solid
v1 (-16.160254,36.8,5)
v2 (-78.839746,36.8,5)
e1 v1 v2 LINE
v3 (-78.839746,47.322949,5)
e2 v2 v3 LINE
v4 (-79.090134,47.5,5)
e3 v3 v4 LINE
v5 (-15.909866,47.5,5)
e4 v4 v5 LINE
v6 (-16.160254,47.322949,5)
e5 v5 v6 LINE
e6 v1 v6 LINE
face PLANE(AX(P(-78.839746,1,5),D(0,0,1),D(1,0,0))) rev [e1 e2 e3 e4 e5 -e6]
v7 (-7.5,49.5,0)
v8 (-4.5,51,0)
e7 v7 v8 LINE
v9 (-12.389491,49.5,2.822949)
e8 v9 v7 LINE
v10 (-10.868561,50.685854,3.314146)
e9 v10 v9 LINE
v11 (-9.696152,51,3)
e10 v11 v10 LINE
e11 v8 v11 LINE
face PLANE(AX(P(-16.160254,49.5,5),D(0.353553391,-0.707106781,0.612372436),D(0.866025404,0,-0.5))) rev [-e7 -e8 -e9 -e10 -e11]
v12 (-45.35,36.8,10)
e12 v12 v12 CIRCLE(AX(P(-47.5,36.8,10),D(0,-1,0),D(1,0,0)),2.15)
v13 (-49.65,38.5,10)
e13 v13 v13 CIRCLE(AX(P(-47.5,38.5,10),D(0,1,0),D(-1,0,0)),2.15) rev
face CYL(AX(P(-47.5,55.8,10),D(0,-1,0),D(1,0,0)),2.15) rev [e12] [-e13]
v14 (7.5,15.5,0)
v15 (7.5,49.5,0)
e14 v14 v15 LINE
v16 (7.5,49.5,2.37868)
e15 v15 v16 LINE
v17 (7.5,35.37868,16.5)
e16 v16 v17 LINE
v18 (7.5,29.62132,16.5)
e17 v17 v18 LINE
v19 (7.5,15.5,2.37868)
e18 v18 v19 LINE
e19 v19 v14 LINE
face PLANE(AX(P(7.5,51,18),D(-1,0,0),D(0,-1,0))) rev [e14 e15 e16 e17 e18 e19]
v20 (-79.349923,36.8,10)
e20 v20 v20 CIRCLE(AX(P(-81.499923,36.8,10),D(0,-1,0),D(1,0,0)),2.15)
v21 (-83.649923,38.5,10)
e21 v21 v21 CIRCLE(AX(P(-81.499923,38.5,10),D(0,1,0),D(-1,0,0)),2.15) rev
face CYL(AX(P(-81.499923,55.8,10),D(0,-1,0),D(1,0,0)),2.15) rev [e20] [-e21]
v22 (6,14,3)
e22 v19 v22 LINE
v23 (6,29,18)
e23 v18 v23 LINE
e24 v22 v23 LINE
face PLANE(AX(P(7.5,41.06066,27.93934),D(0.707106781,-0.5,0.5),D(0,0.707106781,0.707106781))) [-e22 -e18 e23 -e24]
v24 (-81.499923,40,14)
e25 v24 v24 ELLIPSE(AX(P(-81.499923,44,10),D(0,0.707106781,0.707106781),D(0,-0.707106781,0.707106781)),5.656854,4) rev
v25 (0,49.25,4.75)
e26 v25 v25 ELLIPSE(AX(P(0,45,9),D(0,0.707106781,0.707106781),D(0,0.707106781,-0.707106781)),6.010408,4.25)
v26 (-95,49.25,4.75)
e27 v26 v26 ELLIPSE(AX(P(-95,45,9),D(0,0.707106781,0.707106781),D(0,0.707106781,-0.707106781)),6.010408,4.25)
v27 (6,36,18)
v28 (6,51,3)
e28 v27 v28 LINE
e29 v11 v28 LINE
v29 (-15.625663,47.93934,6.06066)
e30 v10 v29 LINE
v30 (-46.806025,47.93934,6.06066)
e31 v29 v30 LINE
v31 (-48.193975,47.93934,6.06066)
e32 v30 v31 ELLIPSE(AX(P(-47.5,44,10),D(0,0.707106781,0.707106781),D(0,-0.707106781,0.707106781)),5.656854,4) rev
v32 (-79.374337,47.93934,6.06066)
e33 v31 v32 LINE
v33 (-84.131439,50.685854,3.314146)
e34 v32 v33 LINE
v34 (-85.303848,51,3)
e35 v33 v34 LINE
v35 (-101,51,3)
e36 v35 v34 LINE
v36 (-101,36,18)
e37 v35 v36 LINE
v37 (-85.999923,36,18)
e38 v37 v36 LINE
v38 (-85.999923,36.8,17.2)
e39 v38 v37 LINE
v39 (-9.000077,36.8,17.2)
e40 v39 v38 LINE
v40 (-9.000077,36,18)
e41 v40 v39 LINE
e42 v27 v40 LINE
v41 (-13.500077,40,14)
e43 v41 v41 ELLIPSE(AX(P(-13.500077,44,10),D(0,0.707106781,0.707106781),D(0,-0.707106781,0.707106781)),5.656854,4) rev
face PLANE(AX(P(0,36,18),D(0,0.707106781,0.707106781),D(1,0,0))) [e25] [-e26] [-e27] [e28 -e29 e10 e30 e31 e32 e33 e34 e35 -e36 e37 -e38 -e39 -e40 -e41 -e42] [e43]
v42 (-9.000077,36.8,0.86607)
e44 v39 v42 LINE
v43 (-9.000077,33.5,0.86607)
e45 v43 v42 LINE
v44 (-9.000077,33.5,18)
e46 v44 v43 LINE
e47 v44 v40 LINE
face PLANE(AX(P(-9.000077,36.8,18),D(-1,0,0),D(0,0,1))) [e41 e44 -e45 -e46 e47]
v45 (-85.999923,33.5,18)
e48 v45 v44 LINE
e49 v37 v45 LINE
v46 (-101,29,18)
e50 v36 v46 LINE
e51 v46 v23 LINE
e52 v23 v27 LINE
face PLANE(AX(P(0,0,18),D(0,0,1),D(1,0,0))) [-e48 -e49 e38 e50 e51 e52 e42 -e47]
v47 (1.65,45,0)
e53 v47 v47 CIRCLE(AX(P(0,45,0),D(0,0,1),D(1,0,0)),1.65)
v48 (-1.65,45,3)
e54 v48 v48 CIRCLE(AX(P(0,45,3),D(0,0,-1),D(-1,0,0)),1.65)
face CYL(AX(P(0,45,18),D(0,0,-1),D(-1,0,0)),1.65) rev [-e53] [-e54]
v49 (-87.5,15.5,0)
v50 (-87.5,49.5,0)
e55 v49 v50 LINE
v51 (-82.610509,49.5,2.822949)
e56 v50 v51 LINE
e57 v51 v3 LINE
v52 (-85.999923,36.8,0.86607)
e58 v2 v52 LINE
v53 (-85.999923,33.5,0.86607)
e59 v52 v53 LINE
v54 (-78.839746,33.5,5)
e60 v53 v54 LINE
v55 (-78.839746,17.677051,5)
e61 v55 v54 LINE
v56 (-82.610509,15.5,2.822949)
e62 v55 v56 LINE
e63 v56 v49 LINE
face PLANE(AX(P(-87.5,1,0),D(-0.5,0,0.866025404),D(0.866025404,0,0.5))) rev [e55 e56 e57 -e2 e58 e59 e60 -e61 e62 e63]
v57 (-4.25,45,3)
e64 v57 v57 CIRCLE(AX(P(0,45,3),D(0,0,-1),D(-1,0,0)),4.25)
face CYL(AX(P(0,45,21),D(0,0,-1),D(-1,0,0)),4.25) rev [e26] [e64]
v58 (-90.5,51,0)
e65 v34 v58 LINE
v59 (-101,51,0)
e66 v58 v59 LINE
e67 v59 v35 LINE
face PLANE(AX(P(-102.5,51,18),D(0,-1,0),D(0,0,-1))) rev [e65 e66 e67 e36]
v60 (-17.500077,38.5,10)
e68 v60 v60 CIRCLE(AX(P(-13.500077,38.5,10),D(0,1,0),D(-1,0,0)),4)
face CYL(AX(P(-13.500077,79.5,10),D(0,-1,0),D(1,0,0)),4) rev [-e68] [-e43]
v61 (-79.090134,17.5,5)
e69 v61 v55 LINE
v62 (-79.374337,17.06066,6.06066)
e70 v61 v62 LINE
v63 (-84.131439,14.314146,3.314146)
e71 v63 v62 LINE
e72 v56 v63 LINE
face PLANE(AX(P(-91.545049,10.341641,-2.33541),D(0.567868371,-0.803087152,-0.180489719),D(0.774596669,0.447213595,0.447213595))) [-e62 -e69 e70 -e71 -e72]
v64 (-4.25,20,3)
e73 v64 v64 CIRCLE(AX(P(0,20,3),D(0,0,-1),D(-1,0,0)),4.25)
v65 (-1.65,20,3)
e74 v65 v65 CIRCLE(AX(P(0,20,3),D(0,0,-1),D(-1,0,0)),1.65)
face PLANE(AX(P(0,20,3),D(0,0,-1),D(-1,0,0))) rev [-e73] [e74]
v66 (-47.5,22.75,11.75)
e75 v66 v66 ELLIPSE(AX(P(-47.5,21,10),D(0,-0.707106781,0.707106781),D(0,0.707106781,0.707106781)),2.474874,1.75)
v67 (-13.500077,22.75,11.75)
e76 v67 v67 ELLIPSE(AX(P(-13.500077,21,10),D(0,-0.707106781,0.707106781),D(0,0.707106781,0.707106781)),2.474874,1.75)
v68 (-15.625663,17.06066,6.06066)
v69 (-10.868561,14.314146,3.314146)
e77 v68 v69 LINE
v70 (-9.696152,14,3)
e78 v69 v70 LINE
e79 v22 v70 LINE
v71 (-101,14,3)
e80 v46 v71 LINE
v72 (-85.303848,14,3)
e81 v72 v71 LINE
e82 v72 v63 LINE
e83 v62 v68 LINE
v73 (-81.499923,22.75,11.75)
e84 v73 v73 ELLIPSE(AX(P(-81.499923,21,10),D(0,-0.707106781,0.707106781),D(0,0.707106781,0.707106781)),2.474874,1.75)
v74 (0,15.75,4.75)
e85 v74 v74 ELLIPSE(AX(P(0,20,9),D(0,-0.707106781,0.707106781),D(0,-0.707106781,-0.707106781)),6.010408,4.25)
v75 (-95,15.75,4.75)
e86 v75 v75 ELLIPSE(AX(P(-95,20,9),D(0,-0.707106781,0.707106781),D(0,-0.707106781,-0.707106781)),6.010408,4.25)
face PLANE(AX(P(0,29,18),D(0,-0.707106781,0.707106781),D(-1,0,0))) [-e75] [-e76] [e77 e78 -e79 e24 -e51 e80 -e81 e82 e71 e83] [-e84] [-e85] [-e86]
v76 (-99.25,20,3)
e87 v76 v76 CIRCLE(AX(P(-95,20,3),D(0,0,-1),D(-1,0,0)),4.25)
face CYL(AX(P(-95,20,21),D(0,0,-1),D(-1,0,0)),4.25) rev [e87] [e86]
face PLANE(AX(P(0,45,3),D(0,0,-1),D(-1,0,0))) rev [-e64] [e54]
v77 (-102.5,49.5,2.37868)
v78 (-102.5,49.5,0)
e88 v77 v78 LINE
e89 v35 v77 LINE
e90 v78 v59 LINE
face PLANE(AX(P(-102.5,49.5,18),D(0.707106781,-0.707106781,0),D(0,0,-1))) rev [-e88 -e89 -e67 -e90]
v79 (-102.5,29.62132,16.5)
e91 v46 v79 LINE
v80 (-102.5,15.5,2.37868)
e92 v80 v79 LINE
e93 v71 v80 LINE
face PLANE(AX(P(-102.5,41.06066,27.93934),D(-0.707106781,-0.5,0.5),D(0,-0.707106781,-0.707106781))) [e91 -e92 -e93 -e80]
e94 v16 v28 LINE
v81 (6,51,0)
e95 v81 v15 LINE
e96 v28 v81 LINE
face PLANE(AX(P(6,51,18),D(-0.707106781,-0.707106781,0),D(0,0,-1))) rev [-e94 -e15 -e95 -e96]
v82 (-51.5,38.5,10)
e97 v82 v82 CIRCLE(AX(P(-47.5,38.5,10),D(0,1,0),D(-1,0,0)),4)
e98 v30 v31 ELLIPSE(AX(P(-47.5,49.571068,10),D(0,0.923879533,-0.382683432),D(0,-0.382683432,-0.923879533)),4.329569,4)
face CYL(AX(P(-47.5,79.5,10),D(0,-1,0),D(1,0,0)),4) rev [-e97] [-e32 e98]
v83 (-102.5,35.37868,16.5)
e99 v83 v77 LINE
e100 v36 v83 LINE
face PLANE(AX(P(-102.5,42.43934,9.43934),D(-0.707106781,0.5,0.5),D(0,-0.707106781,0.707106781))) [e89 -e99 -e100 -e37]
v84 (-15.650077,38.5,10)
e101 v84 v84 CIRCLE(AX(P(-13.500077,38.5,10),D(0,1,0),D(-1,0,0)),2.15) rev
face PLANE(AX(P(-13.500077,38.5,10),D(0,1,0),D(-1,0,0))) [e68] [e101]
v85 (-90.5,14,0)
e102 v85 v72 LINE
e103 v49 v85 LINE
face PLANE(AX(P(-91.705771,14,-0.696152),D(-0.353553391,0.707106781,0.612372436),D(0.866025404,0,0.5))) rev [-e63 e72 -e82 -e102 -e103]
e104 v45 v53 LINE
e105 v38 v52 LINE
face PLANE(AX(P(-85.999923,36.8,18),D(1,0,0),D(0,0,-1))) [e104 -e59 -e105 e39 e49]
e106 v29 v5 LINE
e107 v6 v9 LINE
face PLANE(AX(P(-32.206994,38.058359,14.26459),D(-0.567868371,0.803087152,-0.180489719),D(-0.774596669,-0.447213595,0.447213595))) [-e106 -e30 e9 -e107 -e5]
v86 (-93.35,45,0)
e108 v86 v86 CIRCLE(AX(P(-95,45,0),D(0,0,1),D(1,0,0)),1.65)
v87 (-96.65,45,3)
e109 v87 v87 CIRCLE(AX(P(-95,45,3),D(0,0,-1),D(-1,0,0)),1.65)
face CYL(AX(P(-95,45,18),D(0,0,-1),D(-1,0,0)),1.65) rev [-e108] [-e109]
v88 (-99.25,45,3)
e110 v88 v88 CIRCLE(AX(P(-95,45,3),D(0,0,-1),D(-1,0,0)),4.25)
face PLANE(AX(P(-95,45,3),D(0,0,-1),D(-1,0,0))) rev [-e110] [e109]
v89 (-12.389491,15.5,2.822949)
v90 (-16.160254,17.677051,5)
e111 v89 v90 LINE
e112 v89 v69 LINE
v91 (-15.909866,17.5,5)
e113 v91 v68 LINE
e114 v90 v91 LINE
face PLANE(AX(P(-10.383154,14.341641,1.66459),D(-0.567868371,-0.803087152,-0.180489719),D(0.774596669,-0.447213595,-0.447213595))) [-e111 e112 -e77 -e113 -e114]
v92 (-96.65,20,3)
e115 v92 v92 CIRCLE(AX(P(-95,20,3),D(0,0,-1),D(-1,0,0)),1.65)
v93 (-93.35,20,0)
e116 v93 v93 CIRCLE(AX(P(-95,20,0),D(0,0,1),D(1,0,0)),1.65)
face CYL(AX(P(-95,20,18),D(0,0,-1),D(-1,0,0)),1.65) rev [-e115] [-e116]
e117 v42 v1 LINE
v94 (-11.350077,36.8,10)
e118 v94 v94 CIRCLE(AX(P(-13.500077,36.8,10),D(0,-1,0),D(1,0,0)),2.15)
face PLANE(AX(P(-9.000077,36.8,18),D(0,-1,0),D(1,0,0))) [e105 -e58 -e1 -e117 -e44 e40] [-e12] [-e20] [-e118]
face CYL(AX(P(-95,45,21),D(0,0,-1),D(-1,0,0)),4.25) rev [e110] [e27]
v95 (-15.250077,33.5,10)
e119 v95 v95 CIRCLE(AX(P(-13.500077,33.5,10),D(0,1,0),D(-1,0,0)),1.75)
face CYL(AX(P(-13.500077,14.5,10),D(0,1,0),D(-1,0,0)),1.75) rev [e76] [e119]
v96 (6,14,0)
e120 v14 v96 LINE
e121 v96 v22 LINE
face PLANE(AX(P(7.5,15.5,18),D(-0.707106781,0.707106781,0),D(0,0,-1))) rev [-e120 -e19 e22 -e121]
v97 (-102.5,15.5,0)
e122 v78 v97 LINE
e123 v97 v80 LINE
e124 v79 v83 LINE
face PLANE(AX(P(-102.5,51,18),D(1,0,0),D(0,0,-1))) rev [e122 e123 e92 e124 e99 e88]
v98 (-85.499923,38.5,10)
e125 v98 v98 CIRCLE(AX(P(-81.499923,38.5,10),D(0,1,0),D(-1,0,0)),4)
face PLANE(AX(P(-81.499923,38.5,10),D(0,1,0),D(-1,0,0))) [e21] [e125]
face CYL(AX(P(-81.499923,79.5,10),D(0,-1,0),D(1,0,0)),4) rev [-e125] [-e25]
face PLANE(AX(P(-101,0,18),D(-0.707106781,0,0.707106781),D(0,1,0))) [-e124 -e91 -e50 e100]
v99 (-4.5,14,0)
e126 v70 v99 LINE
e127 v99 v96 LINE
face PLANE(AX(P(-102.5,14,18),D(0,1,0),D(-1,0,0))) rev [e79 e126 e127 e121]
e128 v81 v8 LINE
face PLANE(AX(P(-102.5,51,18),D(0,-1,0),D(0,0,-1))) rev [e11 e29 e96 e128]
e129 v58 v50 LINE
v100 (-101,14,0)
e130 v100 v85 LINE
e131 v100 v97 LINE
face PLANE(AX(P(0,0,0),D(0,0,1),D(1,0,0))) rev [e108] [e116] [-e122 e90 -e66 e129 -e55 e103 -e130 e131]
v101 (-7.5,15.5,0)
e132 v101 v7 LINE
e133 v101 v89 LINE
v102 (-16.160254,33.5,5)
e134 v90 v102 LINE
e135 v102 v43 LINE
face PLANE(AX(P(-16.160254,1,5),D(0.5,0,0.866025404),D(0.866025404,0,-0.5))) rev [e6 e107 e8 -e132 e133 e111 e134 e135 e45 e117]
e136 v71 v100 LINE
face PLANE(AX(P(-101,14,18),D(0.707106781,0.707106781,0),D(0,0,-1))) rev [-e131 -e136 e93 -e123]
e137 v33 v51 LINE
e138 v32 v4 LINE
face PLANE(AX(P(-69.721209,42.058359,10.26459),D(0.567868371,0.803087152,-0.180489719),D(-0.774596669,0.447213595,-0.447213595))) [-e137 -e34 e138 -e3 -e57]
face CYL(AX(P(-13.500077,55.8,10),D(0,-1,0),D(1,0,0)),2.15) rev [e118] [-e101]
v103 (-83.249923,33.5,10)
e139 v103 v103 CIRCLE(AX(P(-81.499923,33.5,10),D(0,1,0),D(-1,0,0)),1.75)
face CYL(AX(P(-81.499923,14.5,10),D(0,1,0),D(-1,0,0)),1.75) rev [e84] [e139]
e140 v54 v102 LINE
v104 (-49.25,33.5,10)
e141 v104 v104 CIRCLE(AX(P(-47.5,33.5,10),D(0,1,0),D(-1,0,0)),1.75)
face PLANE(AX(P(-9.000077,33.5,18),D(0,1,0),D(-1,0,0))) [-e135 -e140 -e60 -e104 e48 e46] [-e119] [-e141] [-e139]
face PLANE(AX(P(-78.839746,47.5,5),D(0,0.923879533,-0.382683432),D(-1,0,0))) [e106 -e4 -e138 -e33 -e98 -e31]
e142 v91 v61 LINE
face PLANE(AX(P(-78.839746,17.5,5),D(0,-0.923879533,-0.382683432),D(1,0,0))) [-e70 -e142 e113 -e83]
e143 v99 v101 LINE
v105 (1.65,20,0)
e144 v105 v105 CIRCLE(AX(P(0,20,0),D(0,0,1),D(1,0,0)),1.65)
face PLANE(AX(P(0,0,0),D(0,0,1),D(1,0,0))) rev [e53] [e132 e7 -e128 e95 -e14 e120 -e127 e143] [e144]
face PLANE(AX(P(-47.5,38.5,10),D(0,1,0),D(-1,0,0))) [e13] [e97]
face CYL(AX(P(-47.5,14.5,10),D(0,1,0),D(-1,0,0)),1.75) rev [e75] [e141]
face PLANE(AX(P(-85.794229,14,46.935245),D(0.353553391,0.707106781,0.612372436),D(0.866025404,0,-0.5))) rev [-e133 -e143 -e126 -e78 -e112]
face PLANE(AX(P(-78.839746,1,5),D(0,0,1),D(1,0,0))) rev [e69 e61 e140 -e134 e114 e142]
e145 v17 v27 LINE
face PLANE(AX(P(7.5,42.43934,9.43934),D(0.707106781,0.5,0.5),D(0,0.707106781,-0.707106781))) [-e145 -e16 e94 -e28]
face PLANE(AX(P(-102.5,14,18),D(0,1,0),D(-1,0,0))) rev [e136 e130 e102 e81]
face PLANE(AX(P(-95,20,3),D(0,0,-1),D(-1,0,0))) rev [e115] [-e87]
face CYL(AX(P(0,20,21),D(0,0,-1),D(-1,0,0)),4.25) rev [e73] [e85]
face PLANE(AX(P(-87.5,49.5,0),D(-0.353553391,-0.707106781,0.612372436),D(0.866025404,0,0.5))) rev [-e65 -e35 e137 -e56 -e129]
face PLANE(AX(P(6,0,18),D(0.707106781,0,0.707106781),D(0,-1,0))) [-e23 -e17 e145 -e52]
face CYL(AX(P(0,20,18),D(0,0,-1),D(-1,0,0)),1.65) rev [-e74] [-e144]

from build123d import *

# Parameters (mm, degrees)
SKETCH1_W          = 110
SKETCH1_H          = 37
SKETCH1_W_2        = 76.99984649
SKETCH1_H_2        = 3.3
EXTRUDE1_DEPTH     = 18
CHAMFER1_SIZE      = 15
SKETCH3_R          = 4.25
CUT_EXTRUDE1_DEPTH = 18
SKETCH4_R          = 2.15
CUT_EXTRUDE2_DEPTH = 19
SKETCH5_R          = 1.75
CUT_EXTRUDE3_DEPTH = 19
SKETCH6_R          = 4
CUT_EXTRUDE4_DEPTH = 41
CUT_EXTRUDE5_DEPTH = 50
CHAMFER2_SIZE      = 1.5
CHAMFER4_SIZE      = 1.5


with BuildPart() as part:
    # Sketch1 → Extrude1 (new body)
    with BuildSketch(Plane.XY):
        with Locations((-47.5, 32.5)):
            Rectangle(SKETCH1_W, SKETCH1_H)
        with Locations((-47.499999999, 35.15)):
            Rectangle(SKETCH1_W_2, SKETCH1_H_2, mode=Mode.SUBTRACT)
        with BuildLine():
            ThreePointArc((-95, 18.35), (-93.35, 20), (-95, 21.65))
            ThreePointArc((-95, 21.65), (-96.65, 20), (-95, 18.35))
        make_face(mode=Mode.SUBTRACT)
        with BuildLine():
            ThreePointArc((0, 18.35), (1.65, 20), (0, 21.65))
            ThreePointArc((0, 21.65), (-1.65, 20), (0, 18.35))
        make_face(mode=Mode.SUBTRACT)
        with BuildLine():
            ThreePointArc((0, 43.35), (1.65, 45), (0, 46.65))
            ThreePointArc((0, 46.65), (-1.65, 45), (0, 43.35))
        make_face(mode=Mode.SUBTRACT)
        with BuildLine():
            ThreePointArc((-95, 43.35), (-93.35, 45), (-95, 46.65))
            ThreePointArc((-95, 46.65), (-96.65, 45), (-95, 43.35))
        make_face(mode=Mode.SUBTRACT)
    extrude(amount=EXTRUDE1_DEPTH)

    # Chamfer1
    # the kernel refuses this chamfer: 15 mm, written as the material it takes off along each edge
    with BuildSketch(Plane(origin=(46.075244819, 14, 18), x_dir=(0, 0.9996219169112968, 0.02749587661058632), z_dir=(-1, 0, 0))) as chamfer1_piece_1:
        Polygon((CHAMFER1_SIZE * 0.999621916911, CHAMFER1_SIZE * 0.0274958766106), (-CHAMFER1_SIZE * 0.0274958766106, CHAMFER1_SIZE * 0.999621916911), (0, 0), align=None)
    extrude(amount=187.150489639, mode=Mode.SUBTRACT)
    with BuildSketch(Plane(origin=(-141.075244819, 51, 18), x_dir=(0, 0.02749587661058632, -0.9996219169112968), z_dir=(1, 0, 0))) as chamfer1_piece_2:
        Polygon((CHAMFER1_SIZE * 0.999621916911, -CHAMFER1_SIZE * 0.0274958766106), (-CHAMFER1_SIZE * 0.0274958766106, -CHAMFER1_SIZE * 0.999621916911), (0, 0), align=None)
    extrude(amount=187.150489639, mode=Mode.SUBTRACT)

    # Sketch3 → Cut-Extrude1 (cut)
    with BuildSketch(Plane(origin=(0, 0, 3), x_dir=(-1, 0, 0), z_dir=(0, 0, -1))):
        with Locations((0, 20)):
            Circle(SKETCH3_R)
        with Locations((95, 20)):
            Circle(SKETCH3_R)
        with Locations((0, 45)):
            Circle(SKETCH3_R)
        with Locations((95, 45)):
            Circle(SKETCH3_R)
    extrude(amount=-CUT_EXTRUDE1_DEPTH, mode=Mode.SUBTRACT)

    # Sketch4 → Cut-Extrude2 (cut)
    with BuildSketch(Plane.XZ.offset(-36.8)):
        with Locations((-13.500076755, 10)):
            Circle(SKETCH4_R)
        with Locations((-81.499923245, 10)):
            Circle(SKETCH4_R)
        with Locations((-47.5, 10)):
            Circle(SKETCH4_R)
    extrude(amount=-CUT_EXTRUDE2_DEPTH, mode=Mode.SUBTRACT)

    # Sketch5 → Cut-Extrude3 (cut)
    with BuildSketch(Plane(origin=(0, 33.5, 0), x_dir=(1, 0, 0), z_dir=(0, 1, 0))):
        with Locations(Location((-81.499923245, -10, 0), (0, 0, 180))):
            Circle(SKETCH5_R)
        with Locations(Location((-47.5, -10, 0), (0, 0, 180))):
            Circle(SKETCH5_R)
        with Locations(Location((-13.500076755, -10, 0), (0, 0, 180))):
            Circle(SKETCH5_R)
    extrude(amount=-CUT_EXTRUDE3_DEPTH, mode=Mode.SUBTRACT)

    # Sketch6 → Cut-Extrude4 (cut)
    with BuildSketch(Plane(origin=(0, 38.5, 0), x_dir=(1, 0, 0), z_dir=(0, 1, 0))):
        with Locations(Location((-81.499923245, -10, 0), (0, 0, 270))):
            Circle(SKETCH6_R)
        with Locations(Location((-47.5, -10, 0), (0, 0, 270))):
            Circle(SKETCH6_R)
        with Locations(Location((-13.500076755, -10, 0), (0, 0, 270))):
            Circle(SKETCH6_R)
    extrude(amount=CUT_EXTRUDE4_DEPTH, mode=Mode.SUBTRACT)

    # Sketch7 → Cut-Extrude5 (cut)
    with BuildSketch(Plane(origin=(0, 51, 0), x_dir=(1, 0, 0), z_dir=(0, 1, 0))):
        Polygon((-87.5, 0), (-78.839745962, -5), (-16.160254038, -5), (-7.5, 0), align=None)
    extrude(amount=-CUT_EXTRUDE5_DEPTH, mode=Mode.SUBTRACT)

    # Chamfer2
    # the kernel refuses this chamfer: 1.5 mm, written as the material it takes off along each edge
    with BuildSketch(Plane(origin=(-78.96313338, 14, 4.928762241), x_dir=(0.013747938305293264, 0.9996219169112968, -0.023812127644090672), z_dir=(-0.8660254037844418, 0, -0.4999999999999946)), Plane(origin=(-4.159285803, 14, -1.928762241), x_dir=(-0.013747938305293165, 0.9996219169112968, -0.023812127644090405), z_dir=(-0.8660254037844415, 0, 0.4999999999999952))) as chamfer2_piece_1:
        Polygon((CHAMFER2_SIZE * 0.999621916911, -CHAMFER2_SIZE * 0.0274958766106), (-CHAMFER2_SIZE * 0.0274958766106, -CHAMFER2_SIZE * 0.999621916911), (0, 0), align=None)
    extrude(amount=13.715048964, mode=Mode.SUBTRACT)
    with BuildSketch(Plane(origin=(-75.882016438, 17.707645937, 6.707645937), x_dir=(-0.3694215037629502, 0.8938706433396608, -0.2540138294130098), z_dir=(-0.7745966692416119, -0.447213595499668, -0.4472135955000256))) as chamfer2_piece_2_section:
        Polygon((CHAMFER2_SIZE * 0.999377760799, -CHAMFER2_SIZE * 0.0352716773028), (CHAMFER2_SIZE * 0.584106684268, -CHAMFER2_SIZE * 0.811676894702), (0, 0), align=None)
    chamfer2_piece_2 = extrude(amount=12.108960747, mode=Mode.PRIVATE)
    chamfer2_piece_2 = split(chamfer2_piece_2, bisect_by=Plane(origin=(-82.667383696, 14.794770385, 5), z_dir=(0, 0, -1)), keep=Keep.TOP, mode=Mode.PRIVATE)
    add(chamfer2_piece_2, mode=Mode.SUBTRACT)
    with BuildSketch(Plane(origin=(-12.350330304, 16, 5), x_dir=(0, 0.9993382493585172, -0.03637393804709672), z_dir=(-1, 0, 0))) as chamfer2_piece_3_section:
        Polygon((CHAMFER2_SIZE * 0.999338249359, -CHAMFER2_SIZE * 0.0363739380471), (CHAMFER2_SIZE * 0.680918594569, -CHAMFER2_SIZE * 0.732359111072), (0, 0), align=None)
    chamfer2_piece_3 = extrude(amount=70.299339393, mode=Mode.PRIVATE)
    chamfer2_piece_3 = split(chamfer2_piece_3, bisect_by=Plane(origin=(-55.185271761, 16.844039672, 18.656917048), z_dir=(0.4999999999999946, 0, -0.8660254037844418)), keep=Keep.TOP, mode=Mode.PRIVATE)
    chamfer2_piece_3 = split(chamfer2_piece_3, bisect_by=Plane(origin=(-39.814728239, 16.844039672, 18.656917048), z_dir=(-0.4999999999999952, 0, -0.8660254037844415)), keep=Keep.TOP, mode=Mode.PRIVATE)
    add(chamfer2_piece_3, mode=Mode.SUBTRACT)
    with BuildSketch(Plane(origin=(-9.738422899, 12.292354063, 1.292354063), x_dir=(0.632061993408797, 0.5224409008540435, 0.5723225852636897), z_dir=(-0.7745966692416112, 0.4472135954996684, 0.447213595500026))) as chamfer2_piece_4_section:
        Polygon((CHAMFER2_SIZE * 0.999377760799, CHAMFER2_SIZE * 0.0352716773028), (CHAMFER2_SIZE * 0.584106684268, CHAMFER2_SIZE * 0.811676894702), (0, 0), align=None)
    chamfer2_piece_4 = extrude(amount=12.108960747, mode=Mode.PRIVATE)
    chamfer2_piece_4 = split(chamfer2_piece_4, bisect_by=Plane(origin=(-12.332616304, 14.794770385, 5), z_dir=(0, 0, -1)), keep=Keep.TOP, mode=Mode.PRIVATE)
    add(chamfer2_piece_4, mode=Mode.SUBTRACT)
    with BuildSketch(Plane(origin=(-90.840714197, 51, -1.928762241), x_dir=(-0.49981095845564294, 0.027495876610586858, 0.8656979742248834), z_dir=(0.8660254037844418, 0, 0.4999999999999946)), Plane(origin=(-16.03686662, 51, 4.928762241), x_dir=(0.4998109584556436, 0.027495876610586837, 0.8656979742248831), z_dir=(0.8660254037844415, 0, -0.4999999999999952))) as chamfer2_piece_5:
        Polygon((CHAMFER2_SIZE * 0.999621916911, CHAMFER2_SIZE * 0.0274958766106), (-CHAMFER2_SIZE * 0.0274958766106, CHAMFER2_SIZE * 0.999621916911), (0, 0), align=None)
    extrude(amount=13.715048964, mode=Mode.SUBTRACT)
    with BuildSketch(Plane(origin=(-75.882016438, 47.292354063, 6.707645937), x_dir=(-0.36942150376344385, -0.8938706433393748, -0.2540138294132983), z_dir=(-0.7745966692413639, 0.44721359550024015, -0.44721359549988254))) as chamfer2_piece_6_section:
        Polygon((CHAMFER2_SIZE * 0.999377760799, CHAMFER2_SIZE * 0.0352716773028), (CHAMFER2_SIZE * 0.584106684268, CHAMFER2_SIZE * 0.811676894702), (0, 0), align=None)
    chamfer2_piece_6 = extrude(amount=12.108960747, mode=Mode.PRIVATE)
    chamfer2_piece_6 = split(chamfer2_piece_6, bisect_by=Plane(origin=(-82.667383696, 50.205229615, 5), z_dir=(0, 0, -1)), keep=Keep.TOP, mode=Mode.PRIVATE)
    add(chamfer2_piece_6, mode=Mode.SUBTRACT)
    with BuildSketch(Plane(origin=(-9.738422899, 52.707645937, 1.292354063), x_dir=(0.6320619934091002, -0.5224409008543227, 0.5723225852631), z_dir=(-0.7745966692413635, -0.4472135955002406, 0.447213595499883))) as chamfer2_piece_7_section:
        Polygon((CHAMFER2_SIZE * 0.999377760799, -CHAMFER2_SIZE * 0.0352716773028), (CHAMFER2_SIZE * 0.584106684268, -CHAMFER2_SIZE * 0.811676894702), (0, 0), align=None)
    chamfer2_piece_7 = extrude(amount=12.108960747, mode=Mode.PRIVATE)
    chamfer2_piece_7 = split(chamfer2_piece_7, bisect_by=Plane(origin=(-12.332616304, 50.205229615, 5), z_dir=(0, 0, -1)), keep=Keep.TOP, mode=Mode.PRIVATE)
    add(chamfer2_piece_7, mode=Mode.SUBTRACT)
    with BuildSketch(Plane(origin=(-12.350330304, 49, 5), x_dir=(0, -0.6809185945692262, 0.7323591110717951), z_dir=(-1, 0, 0))) as chamfer2_piece_8_section:
        Polygon((CHAMFER2_SIZE * 0.999338249359, -CHAMFER2_SIZE * 0.0363739380471), (CHAMFER2_SIZE * 0.680918594569, -CHAMFER2_SIZE * 0.732359111072), (0, 0), align=None)
    chamfer2_piece_8 = extrude(amount=70.299339393, mode=Mode.PRIVATE)
    chamfer2_piece_8 = split(chamfer2_piece_8, bisect_by=Plane(origin=(-55.185271761, 48.155960328, 18.656917048), z_dir=(0.4999999999999946, 0, -0.8660254037844418)), keep=Keep.TOP, mode=Mode.PRIVATE)
    chamfer2_piece_8 = split(chamfer2_piece_8, bisect_by=Plane(origin=(-39.814728239, 48.155960328, 18.656917048), z_dir=(-0.4999999999999952, 0, -0.8660254037844415)), keep=Keep.TOP, mode=Mode.PRIVATE)
    add(chamfer2_piece_8, mode=Mode.SUBTRACT)
    with BuildSketch(Plane(origin=(-75.882016438, 17.707645937, 6.707645937), x_dir=(-0.3694215037629502, 0.8938706433396608, -0.2540138294130098), z_dir=(-0.7745966692416119, -0.447213595499668, -0.4472135955000256))) as chamfer2_piece_9a_section:
        Polygon((CHAMFER2_SIZE * 0.999377760799, -CHAMFER2_SIZE * 0.0352716773028), (CHAMFER2_SIZE * 0.584106684268, -CHAMFER2_SIZE * 0.811676894702), (0, 0), align=None)
    chamfer2_piece_9a = extrude(amount=12.108960747, mode=Mode.PRIVATE)
    chamfer2_piece_9a = split(chamfer2_piece_9a, bisect_by=Plane(origin=(-78.056519798, 17.459729148, 5), z_dir=(0, 0, 1)), keep=Keep.TOP, mode=Mode.PRIVATE)
    with BuildSketch(Plane(origin=(-12.350330304, 16, 5), x_dir=(0, 0.9993382493585172, -0.03637393804709672), z_dir=(-1, 0, 0))) as chamfer2_piece_9b_section:
        Polygon((CHAMFER2_SIZE * 0.999338249359, -CHAMFER2_SIZE * 0.0363739380471), (CHAMFER2_SIZE * 0.680918594569, -CHAMFER2_SIZE * 0.732359111072), (0, 0), align=None)
    chamfer2_piece_9b = extrude(amount=70.299339393, mode=Mode.PRIVATE)
    chamfer2_piece_9b = split(chamfer2_piece_9b, bisect_by=Plane(origin=(-79.856881758, 16.851083443, 4.412756374), z_dir=(-0.4999999999999946, 0, 0.8660254037844418)), keep=Keep.TOP, mode=Mode.PRIVATE)
    chamfer2_piece_9 = chamfer2_piece_9a & chamfer2_piece_9b
    add(chamfer2_piece_9, mode=Mode.SUBTRACT)
    with BuildSketch(Plane(origin=(-12.350330304, 16, 5), x_dir=(0, 0.9993382493585172, -0.03637393804709672), z_dir=(-1, 0, 0))) as chamfer2_piece_10a_section:
        Polygon((CHAMFER2_SIZE * 0.999338249359, -CHAMFER2_SIZE * 0.0363739380471), (CHAMFER2_SIZE * 0.680918594569, -CHAMFER2_SIZE * 0.732359111072), (0, 0), align=None)
    chamfer2_piece_10a = extrude(amount=70.299339393, mode=Mode.PRIVATE)
    chamfer2_piece_10a = split(chamfer2_piece_10a, bisect_by=Plane(origin=(-15.143118242, 16.851083443, 4.412756374), z_dir=(0.4999999999999952, 0, 0.8660254037844415)), keep=Keep.TOP, mode=Mode.PRIVATE)
    with BuildSketch(Plane(origin=(-9.738422899, 12.292354063, 1.292354063), x_dir=(0.632061993408797, 0.5224409008540435, 0.5723225852636897), z_dir=(-0.7745966692416112, 0.4472135954996684, 0.447213595500026))) as chamfer2_piece_10b_section:
        Polygon((CHAMFER2_SIZE * 0.999377760799, CHAMFER2_SIZE * 0.0352716773028), (CHAMFER2_SIZE * 0.584106684268, CHAMFER2_SIZE * 0.811676894702), (0, 0), align=None)
    chamfer2_piece_10b = extrude(amount=12.108960747, mode=Mode.PRIVATE)
    chamfer2_piece_10b = split(chamfer2_piece_10b, bisect_by=Plane(origin=(-16.943480202, 17.459729148, 5), z_dir=(0, 0, 1)), keep=Keep.TOP, mode=Mode.PRIVATE)
    chamfer2_piece_10 = chamfer2_piece_10a & chamfer2_piece_10b
    add(chamfer2_piece_10, mode=Mode.SUBTRACT)
    with BuildSketch(Plane(origin=(-75.882016438, 47.292354063, 6.707645937), x_dir=(-0.36942150376344385, -0.8938706433393748, -0.2540138294132983), z_dir=(-0.7745966692413639, 0.44721359550024015, -0.44721359549988254))) as chamfer2_piece_11a_section:
        Polygon((CHAMFER2_SIZE * 0.999377760799, CHAMFER2_SIZE * 0.0352716773028), (CHAMFER2_SIZE * 0.584106684268, CHAMFER2_SIZE * 0.811676894702), (0, 0), align=None)
    chamfer2_piece_11a = extrude(amount=12.108960747, mode=Mode.PRIVATE)
    chamfer2_piece_11a = split(chamfer2_piece_11a, bisect_by=Plane(origin=(-78.056519798, 47.540270852, 5), z_dir=(0, 0, 1)), keep=Keep.TOP, mode=Mode.PRIVATE)
    with BuildSketch(Plane(origin=(-12.350330304, 49, 5), x_dir=(0, -0.6809185945692262, 0.7323591110717951), z_dir=(-1, 0, 0))) as chamfer2_piece_11b_section:
        Polygon((CHAMFER2_SIZE * 0.999338249359, -CHAMFER2_SIZE * 0.0363739380471), (CHAMFER2_SIZE * 0.680918594569, -CHAMFER2_SIZE * 0.732359111072), (0, 0), align=None)
    chamfer2_piece_11b = extrude(amount=70.299339393, mode=Mode.PRIVATE)
    chamfer2_piece_11b = split(chamfer2_piece_11b, bisect_by=Plane(origin=(-79.856881758, 48.148916557, 4.412756374), z_dir=(-0.4999999999999946, 0, 0.8660254037844418)), keep=Keep.TOP, mode=Mode.PRIVATE)
    chamfer2_piece_11 = chamfer2_piece_11a & chamfer2_piece_11b
    add(chamfer2_piece_11, mode=Mode.SUBTRACT)
    with BuildSketch(Plane(origin=(-9.738422899, 52.707645937, 1.292354063), x_dir=(0.6320619934091002, -0.5224409008543227, 0.5723225852631), z_dir=(-0.7745966692413635, -0.4472135955002406, 0.447213595499883))) as chamfer2_piece_12a_section:
        Polygon((CHAMFER2_SIZE * 0.999377760799, -CHAMFER2_SIZE * 0.0352716773028), (CHAMFER2_SIZE * 0.584106684268, -CHAMFER2_SIZE * 0.811676894702), (0, 0), align=None)
    chamfer2_piece_12a = extrude(amount=12.108960747, mode=Mode.PRIVATE)
    chamfer2_piece_12a = split(chamfer2_piece_12a, bisect_by=Plane(origin=(-16.943480202, 47.540270852, 5), z_dir=(0, 0, 1)), keep=Keep.TOP, mode=Mode.PRIVATE)
    with BuildSketch(Plane(origin=(-12.350330304, 49, 5), x_dir=(0, -0.6809185945692262, 0.7323591110717951), z_dir=(-1, 0, 0))) as chamfer2_piece_12b_section:
        Polygon((CHAMFER2_SIZE * 0.999338249359, -CHAMFER2_SIZE * 0.0363739380471), (CHAMFER2_SIZE * 0.680918594569, -CHAMFER2_SIZE * 0.732359111072), (0, 0), align=None)
    chamfer2_piece_12b = extrude(amount=70.299339393, mode=Mode.PRIVATE)
    chamfer2_piece_12b = split(chamfer2_piece_12b, bisect_by=Plane(origin=(-15.143118242, 48.148916557, 4.412756374), z_dir=(0.4999999999999952, 0, 0.8660254037844415)), keep=Keep.TOP, mode=Mode.PRIVATE)
    chamfer2_piece_12 = chamfer2_piece_12a & chamfer2_piece_12b
    add(chamfer2_piece_12, mode=Mode.SUBTRACT)

    # Chamfer4
    chamfer4_edges = [part.edges().sort_by_distance(p)[0] for p in [
        (-102.5, 32.5, 18),
        (7.5, 32.5, 18),
        (7.5, 51, 1.5),
        (7.5, 14, 1.5),
        (7.5, 43.5, 10.5),
        (7.5, 21.5, 10.5),
        (-102.5, 14, 1.5),
        (-102.5, 51, 1.5),
        (-102.5, 43.5, 10.5),
        (-102.5, 21.5, 10.5),
    ]]
    chamfer(chamfer4_edges, length=CHAMFER4_SIZE)


solid = part.part
